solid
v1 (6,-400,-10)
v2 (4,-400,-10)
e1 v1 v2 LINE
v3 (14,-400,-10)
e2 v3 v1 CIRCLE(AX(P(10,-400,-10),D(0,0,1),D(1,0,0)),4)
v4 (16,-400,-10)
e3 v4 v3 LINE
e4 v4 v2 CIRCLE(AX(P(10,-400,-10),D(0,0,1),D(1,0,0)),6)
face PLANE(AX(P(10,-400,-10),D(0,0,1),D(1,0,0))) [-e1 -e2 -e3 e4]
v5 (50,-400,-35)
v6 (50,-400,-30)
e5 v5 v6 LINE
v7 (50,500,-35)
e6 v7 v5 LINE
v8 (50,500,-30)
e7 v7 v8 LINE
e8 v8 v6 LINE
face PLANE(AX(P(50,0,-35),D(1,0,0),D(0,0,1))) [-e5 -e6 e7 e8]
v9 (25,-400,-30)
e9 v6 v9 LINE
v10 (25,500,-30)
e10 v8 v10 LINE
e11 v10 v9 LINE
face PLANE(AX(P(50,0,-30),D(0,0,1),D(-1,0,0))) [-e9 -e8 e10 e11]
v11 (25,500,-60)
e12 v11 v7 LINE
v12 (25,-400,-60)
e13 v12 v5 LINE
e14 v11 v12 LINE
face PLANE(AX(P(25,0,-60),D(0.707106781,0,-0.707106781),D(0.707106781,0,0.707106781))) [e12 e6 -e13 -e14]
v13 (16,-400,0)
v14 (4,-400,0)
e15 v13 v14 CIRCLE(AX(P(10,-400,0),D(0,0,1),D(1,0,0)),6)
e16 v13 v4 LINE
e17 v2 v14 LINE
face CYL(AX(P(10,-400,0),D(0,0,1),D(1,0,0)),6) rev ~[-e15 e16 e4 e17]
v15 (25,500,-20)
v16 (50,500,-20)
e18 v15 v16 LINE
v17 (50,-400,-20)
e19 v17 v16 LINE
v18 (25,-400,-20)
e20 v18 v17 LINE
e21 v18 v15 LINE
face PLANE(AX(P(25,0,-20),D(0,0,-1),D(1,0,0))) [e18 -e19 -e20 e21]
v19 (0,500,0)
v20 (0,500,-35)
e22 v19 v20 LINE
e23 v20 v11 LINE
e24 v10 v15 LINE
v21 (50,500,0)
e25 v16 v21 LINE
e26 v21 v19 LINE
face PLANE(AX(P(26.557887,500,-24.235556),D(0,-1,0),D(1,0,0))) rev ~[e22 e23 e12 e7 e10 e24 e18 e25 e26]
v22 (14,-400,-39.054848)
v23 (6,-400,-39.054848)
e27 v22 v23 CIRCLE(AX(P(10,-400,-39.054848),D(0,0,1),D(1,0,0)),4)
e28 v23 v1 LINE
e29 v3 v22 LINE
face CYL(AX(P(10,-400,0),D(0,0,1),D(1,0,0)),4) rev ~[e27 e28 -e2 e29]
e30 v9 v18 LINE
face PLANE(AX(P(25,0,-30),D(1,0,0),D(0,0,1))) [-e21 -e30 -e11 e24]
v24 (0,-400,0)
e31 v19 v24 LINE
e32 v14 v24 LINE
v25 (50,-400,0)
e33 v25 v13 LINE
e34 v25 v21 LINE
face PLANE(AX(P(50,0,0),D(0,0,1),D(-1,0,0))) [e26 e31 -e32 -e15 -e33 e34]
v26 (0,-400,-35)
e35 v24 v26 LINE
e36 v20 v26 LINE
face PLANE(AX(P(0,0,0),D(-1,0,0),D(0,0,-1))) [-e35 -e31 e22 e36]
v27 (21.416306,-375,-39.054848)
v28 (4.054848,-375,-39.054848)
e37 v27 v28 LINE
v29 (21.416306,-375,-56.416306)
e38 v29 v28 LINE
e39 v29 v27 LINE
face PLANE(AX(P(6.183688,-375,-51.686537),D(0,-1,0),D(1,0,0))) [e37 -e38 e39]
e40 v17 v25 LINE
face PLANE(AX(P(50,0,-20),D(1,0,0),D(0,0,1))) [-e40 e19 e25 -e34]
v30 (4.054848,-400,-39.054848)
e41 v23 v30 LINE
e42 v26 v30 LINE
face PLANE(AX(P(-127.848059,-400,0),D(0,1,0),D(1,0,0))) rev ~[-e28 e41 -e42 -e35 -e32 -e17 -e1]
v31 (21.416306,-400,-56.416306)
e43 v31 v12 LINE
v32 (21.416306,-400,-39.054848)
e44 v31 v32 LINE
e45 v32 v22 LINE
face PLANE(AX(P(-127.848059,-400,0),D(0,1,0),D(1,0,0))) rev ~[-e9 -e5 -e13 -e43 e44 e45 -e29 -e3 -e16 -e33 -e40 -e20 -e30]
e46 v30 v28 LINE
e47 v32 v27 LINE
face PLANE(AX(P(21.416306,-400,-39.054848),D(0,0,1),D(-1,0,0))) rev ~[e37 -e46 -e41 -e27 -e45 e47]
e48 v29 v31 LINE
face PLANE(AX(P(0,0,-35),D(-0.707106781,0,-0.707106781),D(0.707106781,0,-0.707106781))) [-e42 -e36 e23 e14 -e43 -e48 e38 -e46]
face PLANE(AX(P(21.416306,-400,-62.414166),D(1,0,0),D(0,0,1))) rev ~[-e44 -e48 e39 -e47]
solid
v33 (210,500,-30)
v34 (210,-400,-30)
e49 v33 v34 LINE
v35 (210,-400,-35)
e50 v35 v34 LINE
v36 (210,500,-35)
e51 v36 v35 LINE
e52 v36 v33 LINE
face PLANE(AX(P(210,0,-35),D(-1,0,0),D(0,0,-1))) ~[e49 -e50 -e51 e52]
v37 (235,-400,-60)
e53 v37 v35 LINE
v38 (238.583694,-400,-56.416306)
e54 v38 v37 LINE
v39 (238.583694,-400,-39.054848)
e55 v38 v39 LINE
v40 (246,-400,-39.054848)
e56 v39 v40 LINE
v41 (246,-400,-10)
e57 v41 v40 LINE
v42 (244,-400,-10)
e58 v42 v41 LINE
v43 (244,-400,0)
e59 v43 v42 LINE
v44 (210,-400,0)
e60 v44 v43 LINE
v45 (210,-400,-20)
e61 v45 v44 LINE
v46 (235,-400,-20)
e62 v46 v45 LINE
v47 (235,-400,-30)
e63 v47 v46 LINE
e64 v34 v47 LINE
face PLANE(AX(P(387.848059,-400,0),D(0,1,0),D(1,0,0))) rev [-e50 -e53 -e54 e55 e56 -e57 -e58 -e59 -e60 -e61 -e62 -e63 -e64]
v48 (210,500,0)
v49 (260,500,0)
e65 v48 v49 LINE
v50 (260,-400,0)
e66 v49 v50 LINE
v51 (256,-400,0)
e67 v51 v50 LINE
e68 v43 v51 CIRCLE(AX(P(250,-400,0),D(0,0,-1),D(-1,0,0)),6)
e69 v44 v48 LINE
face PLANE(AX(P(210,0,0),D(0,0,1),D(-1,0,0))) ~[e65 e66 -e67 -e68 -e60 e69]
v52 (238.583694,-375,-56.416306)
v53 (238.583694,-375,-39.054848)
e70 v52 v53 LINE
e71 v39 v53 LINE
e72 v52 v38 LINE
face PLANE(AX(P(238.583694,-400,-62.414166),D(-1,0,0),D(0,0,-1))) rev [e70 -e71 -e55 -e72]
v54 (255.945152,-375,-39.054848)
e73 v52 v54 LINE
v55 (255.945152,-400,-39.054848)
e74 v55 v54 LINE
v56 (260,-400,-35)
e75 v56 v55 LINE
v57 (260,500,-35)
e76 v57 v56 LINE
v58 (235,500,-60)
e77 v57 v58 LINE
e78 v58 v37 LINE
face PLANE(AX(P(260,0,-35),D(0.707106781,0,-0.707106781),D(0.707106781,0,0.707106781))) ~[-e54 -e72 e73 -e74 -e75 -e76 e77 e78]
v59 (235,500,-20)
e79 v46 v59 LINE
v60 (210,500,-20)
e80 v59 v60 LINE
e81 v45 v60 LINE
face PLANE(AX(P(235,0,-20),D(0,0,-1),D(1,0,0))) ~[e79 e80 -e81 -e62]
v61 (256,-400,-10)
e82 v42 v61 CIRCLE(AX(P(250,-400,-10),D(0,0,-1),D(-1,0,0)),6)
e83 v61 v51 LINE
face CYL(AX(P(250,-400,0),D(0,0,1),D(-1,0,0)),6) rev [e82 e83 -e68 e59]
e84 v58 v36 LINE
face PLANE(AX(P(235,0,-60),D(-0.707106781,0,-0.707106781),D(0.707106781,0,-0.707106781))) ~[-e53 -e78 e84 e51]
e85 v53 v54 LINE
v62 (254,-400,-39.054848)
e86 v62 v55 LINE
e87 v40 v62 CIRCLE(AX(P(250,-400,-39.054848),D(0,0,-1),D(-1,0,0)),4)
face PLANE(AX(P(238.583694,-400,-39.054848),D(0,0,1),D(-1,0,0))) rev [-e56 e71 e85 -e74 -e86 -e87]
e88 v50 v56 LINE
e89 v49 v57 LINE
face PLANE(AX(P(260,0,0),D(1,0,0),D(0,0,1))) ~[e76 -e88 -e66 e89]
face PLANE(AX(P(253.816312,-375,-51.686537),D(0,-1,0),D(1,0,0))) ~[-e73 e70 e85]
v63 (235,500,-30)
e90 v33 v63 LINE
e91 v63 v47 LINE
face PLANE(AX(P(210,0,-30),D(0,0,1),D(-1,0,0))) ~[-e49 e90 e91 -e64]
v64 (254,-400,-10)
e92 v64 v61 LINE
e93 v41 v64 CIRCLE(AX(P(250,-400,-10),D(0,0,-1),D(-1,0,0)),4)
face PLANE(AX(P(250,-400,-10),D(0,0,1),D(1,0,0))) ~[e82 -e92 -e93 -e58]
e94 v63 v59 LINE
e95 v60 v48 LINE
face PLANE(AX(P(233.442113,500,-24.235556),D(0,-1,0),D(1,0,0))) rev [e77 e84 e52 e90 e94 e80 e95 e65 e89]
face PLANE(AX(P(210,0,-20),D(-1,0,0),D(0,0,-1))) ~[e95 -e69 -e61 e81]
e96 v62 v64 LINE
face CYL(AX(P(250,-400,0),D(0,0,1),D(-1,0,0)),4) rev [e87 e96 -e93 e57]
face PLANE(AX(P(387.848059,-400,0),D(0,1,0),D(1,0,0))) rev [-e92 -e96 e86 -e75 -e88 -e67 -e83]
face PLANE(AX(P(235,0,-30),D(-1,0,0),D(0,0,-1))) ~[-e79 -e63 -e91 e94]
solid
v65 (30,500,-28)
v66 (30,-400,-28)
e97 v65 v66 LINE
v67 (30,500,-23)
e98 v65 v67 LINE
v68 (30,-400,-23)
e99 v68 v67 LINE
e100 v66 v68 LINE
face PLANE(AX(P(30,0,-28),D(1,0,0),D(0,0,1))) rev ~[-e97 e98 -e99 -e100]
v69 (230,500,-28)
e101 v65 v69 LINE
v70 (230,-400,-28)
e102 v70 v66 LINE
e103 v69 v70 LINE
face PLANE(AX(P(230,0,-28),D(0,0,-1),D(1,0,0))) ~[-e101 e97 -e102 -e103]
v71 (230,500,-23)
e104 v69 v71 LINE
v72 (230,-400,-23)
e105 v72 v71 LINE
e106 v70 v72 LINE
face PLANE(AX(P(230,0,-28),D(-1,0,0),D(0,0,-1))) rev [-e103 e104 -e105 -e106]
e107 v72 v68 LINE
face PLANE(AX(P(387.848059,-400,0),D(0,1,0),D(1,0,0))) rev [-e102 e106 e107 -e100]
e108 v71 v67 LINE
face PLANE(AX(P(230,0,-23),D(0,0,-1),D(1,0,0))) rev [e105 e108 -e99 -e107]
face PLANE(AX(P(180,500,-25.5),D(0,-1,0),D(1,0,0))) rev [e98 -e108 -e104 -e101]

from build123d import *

# Parameters (mm, degrees)
F1_DEPTH      = 500
F2_W          = 100
F2_H          = 5
F3_DEPTH      = 500
F4_R          = 4
F6_DEPTH      = 60.001
F5_R          = 6
F7_DEPTH      = 10
F8_W          = 378.7088692188
F8_H          = 131.297647953
F9_DEPTH      = 60.001
F9_DEPTH_BACK = 1053
F11_DEPTH     = 25


# Not quite as in the source:
# - an extrude ends at something that could not be found from the text; its depth is read off the source's solid


with BuildPart() as f1:
    # F0 (on Front) → F1 (new body, symmetric)
    with BuildSketch(Plane.XZ):
        Polygon((50, 0), (0, 0), (0, -35), (25, -60), (50, -35), (50, -30), (25, -30), (25, -20), (50, -20), align=None)
    extrude(amount=F1_DEPTH, both=True)

    # F4 (on Top) → F6 (cut, through all)
    with BuildSketch(Plane.XY):
        with Locations((10, -400)):
            Circle(F4_R)
    extrude(amount=-F6_DEPTH, mode=Mode.SUBTRACT)

    # F5 (on Top) → F7 (cut)
    with BuildSketch(Plane.XY):
        with Locations((10, -400)):
            Circle(F5_R)
    extrude(amount=-F7_DEPTH, mode=Mode.SUBTRACT)


with BuildPart() as f3:
    # F2 (on Front) → F3 (new body, symmetric)
    with BuildSketch(Plane.XZ):
        with Locations((80, -25.5)):
            Rectangle(F2_W, F2_H)
    extrude(amount=F3_DEPTH, both=True)


with BuildPart() as f9_tool:
    # F8 (on Top) → F9 (new body, two sides)
    with BuildSketch(Plane.XY) as f9_sk:
        with Locations((61.5063756704, -465.6488239765)):
            Rectangle(F8_W, F8_H)
    extrude(amount=-F9_DEPTH)
    extrude(f9_sk.sketch, amount=F9_DEPTH_BACK)


with BuildPart() as f1_1:
    add(f1.part)

    # F9: cut by f9_tool
    add(f9_tool.part, mode=Mode.SUBTRACT)

    # F10 (on face) → F11 (cut)
    with BuildSketch(Plane.XZ.offset(400)):
        Polygon((14, -39.0548482537), (-6.0729645193, -39.0548482537), (-6.0729645193, -62.4141655862), (21.4163064957, -62.4141655862), (21.4163064957, -56.4163064957), (14, -49), align=None)
        Polygon((21.4163064957, -39.0548482537), (14, -39.0548482537), (14, -49), (21.4163064957, -56.4163064957), align=None)
    extrude(amount=-F11_DEPTH, mode=Mode.SUBTRACT)


with BuildPart() as f3_1:
    add(f3.part)

    # F9: cut by f9_tool
    add(f9_tool.part, mode=Mode.SUBTRACT)



with BuildPart() as f3_2:
    add(f3_1.part)
    # F12: F1, F3 across face
    add(f1_1.part.mirror(Plane(origin=(130, 50, -25.5), x_dir=(0, 1, 0), z_dir=(1, 0, 0))))
    add(f3_1.part.mirror(Plane(origin=(130, 50, -25.5), x_dir=(0, 1, 0), z_dir=(1, 0, 0))))


solid = Compound([f1_1.part, f3_2.part])
